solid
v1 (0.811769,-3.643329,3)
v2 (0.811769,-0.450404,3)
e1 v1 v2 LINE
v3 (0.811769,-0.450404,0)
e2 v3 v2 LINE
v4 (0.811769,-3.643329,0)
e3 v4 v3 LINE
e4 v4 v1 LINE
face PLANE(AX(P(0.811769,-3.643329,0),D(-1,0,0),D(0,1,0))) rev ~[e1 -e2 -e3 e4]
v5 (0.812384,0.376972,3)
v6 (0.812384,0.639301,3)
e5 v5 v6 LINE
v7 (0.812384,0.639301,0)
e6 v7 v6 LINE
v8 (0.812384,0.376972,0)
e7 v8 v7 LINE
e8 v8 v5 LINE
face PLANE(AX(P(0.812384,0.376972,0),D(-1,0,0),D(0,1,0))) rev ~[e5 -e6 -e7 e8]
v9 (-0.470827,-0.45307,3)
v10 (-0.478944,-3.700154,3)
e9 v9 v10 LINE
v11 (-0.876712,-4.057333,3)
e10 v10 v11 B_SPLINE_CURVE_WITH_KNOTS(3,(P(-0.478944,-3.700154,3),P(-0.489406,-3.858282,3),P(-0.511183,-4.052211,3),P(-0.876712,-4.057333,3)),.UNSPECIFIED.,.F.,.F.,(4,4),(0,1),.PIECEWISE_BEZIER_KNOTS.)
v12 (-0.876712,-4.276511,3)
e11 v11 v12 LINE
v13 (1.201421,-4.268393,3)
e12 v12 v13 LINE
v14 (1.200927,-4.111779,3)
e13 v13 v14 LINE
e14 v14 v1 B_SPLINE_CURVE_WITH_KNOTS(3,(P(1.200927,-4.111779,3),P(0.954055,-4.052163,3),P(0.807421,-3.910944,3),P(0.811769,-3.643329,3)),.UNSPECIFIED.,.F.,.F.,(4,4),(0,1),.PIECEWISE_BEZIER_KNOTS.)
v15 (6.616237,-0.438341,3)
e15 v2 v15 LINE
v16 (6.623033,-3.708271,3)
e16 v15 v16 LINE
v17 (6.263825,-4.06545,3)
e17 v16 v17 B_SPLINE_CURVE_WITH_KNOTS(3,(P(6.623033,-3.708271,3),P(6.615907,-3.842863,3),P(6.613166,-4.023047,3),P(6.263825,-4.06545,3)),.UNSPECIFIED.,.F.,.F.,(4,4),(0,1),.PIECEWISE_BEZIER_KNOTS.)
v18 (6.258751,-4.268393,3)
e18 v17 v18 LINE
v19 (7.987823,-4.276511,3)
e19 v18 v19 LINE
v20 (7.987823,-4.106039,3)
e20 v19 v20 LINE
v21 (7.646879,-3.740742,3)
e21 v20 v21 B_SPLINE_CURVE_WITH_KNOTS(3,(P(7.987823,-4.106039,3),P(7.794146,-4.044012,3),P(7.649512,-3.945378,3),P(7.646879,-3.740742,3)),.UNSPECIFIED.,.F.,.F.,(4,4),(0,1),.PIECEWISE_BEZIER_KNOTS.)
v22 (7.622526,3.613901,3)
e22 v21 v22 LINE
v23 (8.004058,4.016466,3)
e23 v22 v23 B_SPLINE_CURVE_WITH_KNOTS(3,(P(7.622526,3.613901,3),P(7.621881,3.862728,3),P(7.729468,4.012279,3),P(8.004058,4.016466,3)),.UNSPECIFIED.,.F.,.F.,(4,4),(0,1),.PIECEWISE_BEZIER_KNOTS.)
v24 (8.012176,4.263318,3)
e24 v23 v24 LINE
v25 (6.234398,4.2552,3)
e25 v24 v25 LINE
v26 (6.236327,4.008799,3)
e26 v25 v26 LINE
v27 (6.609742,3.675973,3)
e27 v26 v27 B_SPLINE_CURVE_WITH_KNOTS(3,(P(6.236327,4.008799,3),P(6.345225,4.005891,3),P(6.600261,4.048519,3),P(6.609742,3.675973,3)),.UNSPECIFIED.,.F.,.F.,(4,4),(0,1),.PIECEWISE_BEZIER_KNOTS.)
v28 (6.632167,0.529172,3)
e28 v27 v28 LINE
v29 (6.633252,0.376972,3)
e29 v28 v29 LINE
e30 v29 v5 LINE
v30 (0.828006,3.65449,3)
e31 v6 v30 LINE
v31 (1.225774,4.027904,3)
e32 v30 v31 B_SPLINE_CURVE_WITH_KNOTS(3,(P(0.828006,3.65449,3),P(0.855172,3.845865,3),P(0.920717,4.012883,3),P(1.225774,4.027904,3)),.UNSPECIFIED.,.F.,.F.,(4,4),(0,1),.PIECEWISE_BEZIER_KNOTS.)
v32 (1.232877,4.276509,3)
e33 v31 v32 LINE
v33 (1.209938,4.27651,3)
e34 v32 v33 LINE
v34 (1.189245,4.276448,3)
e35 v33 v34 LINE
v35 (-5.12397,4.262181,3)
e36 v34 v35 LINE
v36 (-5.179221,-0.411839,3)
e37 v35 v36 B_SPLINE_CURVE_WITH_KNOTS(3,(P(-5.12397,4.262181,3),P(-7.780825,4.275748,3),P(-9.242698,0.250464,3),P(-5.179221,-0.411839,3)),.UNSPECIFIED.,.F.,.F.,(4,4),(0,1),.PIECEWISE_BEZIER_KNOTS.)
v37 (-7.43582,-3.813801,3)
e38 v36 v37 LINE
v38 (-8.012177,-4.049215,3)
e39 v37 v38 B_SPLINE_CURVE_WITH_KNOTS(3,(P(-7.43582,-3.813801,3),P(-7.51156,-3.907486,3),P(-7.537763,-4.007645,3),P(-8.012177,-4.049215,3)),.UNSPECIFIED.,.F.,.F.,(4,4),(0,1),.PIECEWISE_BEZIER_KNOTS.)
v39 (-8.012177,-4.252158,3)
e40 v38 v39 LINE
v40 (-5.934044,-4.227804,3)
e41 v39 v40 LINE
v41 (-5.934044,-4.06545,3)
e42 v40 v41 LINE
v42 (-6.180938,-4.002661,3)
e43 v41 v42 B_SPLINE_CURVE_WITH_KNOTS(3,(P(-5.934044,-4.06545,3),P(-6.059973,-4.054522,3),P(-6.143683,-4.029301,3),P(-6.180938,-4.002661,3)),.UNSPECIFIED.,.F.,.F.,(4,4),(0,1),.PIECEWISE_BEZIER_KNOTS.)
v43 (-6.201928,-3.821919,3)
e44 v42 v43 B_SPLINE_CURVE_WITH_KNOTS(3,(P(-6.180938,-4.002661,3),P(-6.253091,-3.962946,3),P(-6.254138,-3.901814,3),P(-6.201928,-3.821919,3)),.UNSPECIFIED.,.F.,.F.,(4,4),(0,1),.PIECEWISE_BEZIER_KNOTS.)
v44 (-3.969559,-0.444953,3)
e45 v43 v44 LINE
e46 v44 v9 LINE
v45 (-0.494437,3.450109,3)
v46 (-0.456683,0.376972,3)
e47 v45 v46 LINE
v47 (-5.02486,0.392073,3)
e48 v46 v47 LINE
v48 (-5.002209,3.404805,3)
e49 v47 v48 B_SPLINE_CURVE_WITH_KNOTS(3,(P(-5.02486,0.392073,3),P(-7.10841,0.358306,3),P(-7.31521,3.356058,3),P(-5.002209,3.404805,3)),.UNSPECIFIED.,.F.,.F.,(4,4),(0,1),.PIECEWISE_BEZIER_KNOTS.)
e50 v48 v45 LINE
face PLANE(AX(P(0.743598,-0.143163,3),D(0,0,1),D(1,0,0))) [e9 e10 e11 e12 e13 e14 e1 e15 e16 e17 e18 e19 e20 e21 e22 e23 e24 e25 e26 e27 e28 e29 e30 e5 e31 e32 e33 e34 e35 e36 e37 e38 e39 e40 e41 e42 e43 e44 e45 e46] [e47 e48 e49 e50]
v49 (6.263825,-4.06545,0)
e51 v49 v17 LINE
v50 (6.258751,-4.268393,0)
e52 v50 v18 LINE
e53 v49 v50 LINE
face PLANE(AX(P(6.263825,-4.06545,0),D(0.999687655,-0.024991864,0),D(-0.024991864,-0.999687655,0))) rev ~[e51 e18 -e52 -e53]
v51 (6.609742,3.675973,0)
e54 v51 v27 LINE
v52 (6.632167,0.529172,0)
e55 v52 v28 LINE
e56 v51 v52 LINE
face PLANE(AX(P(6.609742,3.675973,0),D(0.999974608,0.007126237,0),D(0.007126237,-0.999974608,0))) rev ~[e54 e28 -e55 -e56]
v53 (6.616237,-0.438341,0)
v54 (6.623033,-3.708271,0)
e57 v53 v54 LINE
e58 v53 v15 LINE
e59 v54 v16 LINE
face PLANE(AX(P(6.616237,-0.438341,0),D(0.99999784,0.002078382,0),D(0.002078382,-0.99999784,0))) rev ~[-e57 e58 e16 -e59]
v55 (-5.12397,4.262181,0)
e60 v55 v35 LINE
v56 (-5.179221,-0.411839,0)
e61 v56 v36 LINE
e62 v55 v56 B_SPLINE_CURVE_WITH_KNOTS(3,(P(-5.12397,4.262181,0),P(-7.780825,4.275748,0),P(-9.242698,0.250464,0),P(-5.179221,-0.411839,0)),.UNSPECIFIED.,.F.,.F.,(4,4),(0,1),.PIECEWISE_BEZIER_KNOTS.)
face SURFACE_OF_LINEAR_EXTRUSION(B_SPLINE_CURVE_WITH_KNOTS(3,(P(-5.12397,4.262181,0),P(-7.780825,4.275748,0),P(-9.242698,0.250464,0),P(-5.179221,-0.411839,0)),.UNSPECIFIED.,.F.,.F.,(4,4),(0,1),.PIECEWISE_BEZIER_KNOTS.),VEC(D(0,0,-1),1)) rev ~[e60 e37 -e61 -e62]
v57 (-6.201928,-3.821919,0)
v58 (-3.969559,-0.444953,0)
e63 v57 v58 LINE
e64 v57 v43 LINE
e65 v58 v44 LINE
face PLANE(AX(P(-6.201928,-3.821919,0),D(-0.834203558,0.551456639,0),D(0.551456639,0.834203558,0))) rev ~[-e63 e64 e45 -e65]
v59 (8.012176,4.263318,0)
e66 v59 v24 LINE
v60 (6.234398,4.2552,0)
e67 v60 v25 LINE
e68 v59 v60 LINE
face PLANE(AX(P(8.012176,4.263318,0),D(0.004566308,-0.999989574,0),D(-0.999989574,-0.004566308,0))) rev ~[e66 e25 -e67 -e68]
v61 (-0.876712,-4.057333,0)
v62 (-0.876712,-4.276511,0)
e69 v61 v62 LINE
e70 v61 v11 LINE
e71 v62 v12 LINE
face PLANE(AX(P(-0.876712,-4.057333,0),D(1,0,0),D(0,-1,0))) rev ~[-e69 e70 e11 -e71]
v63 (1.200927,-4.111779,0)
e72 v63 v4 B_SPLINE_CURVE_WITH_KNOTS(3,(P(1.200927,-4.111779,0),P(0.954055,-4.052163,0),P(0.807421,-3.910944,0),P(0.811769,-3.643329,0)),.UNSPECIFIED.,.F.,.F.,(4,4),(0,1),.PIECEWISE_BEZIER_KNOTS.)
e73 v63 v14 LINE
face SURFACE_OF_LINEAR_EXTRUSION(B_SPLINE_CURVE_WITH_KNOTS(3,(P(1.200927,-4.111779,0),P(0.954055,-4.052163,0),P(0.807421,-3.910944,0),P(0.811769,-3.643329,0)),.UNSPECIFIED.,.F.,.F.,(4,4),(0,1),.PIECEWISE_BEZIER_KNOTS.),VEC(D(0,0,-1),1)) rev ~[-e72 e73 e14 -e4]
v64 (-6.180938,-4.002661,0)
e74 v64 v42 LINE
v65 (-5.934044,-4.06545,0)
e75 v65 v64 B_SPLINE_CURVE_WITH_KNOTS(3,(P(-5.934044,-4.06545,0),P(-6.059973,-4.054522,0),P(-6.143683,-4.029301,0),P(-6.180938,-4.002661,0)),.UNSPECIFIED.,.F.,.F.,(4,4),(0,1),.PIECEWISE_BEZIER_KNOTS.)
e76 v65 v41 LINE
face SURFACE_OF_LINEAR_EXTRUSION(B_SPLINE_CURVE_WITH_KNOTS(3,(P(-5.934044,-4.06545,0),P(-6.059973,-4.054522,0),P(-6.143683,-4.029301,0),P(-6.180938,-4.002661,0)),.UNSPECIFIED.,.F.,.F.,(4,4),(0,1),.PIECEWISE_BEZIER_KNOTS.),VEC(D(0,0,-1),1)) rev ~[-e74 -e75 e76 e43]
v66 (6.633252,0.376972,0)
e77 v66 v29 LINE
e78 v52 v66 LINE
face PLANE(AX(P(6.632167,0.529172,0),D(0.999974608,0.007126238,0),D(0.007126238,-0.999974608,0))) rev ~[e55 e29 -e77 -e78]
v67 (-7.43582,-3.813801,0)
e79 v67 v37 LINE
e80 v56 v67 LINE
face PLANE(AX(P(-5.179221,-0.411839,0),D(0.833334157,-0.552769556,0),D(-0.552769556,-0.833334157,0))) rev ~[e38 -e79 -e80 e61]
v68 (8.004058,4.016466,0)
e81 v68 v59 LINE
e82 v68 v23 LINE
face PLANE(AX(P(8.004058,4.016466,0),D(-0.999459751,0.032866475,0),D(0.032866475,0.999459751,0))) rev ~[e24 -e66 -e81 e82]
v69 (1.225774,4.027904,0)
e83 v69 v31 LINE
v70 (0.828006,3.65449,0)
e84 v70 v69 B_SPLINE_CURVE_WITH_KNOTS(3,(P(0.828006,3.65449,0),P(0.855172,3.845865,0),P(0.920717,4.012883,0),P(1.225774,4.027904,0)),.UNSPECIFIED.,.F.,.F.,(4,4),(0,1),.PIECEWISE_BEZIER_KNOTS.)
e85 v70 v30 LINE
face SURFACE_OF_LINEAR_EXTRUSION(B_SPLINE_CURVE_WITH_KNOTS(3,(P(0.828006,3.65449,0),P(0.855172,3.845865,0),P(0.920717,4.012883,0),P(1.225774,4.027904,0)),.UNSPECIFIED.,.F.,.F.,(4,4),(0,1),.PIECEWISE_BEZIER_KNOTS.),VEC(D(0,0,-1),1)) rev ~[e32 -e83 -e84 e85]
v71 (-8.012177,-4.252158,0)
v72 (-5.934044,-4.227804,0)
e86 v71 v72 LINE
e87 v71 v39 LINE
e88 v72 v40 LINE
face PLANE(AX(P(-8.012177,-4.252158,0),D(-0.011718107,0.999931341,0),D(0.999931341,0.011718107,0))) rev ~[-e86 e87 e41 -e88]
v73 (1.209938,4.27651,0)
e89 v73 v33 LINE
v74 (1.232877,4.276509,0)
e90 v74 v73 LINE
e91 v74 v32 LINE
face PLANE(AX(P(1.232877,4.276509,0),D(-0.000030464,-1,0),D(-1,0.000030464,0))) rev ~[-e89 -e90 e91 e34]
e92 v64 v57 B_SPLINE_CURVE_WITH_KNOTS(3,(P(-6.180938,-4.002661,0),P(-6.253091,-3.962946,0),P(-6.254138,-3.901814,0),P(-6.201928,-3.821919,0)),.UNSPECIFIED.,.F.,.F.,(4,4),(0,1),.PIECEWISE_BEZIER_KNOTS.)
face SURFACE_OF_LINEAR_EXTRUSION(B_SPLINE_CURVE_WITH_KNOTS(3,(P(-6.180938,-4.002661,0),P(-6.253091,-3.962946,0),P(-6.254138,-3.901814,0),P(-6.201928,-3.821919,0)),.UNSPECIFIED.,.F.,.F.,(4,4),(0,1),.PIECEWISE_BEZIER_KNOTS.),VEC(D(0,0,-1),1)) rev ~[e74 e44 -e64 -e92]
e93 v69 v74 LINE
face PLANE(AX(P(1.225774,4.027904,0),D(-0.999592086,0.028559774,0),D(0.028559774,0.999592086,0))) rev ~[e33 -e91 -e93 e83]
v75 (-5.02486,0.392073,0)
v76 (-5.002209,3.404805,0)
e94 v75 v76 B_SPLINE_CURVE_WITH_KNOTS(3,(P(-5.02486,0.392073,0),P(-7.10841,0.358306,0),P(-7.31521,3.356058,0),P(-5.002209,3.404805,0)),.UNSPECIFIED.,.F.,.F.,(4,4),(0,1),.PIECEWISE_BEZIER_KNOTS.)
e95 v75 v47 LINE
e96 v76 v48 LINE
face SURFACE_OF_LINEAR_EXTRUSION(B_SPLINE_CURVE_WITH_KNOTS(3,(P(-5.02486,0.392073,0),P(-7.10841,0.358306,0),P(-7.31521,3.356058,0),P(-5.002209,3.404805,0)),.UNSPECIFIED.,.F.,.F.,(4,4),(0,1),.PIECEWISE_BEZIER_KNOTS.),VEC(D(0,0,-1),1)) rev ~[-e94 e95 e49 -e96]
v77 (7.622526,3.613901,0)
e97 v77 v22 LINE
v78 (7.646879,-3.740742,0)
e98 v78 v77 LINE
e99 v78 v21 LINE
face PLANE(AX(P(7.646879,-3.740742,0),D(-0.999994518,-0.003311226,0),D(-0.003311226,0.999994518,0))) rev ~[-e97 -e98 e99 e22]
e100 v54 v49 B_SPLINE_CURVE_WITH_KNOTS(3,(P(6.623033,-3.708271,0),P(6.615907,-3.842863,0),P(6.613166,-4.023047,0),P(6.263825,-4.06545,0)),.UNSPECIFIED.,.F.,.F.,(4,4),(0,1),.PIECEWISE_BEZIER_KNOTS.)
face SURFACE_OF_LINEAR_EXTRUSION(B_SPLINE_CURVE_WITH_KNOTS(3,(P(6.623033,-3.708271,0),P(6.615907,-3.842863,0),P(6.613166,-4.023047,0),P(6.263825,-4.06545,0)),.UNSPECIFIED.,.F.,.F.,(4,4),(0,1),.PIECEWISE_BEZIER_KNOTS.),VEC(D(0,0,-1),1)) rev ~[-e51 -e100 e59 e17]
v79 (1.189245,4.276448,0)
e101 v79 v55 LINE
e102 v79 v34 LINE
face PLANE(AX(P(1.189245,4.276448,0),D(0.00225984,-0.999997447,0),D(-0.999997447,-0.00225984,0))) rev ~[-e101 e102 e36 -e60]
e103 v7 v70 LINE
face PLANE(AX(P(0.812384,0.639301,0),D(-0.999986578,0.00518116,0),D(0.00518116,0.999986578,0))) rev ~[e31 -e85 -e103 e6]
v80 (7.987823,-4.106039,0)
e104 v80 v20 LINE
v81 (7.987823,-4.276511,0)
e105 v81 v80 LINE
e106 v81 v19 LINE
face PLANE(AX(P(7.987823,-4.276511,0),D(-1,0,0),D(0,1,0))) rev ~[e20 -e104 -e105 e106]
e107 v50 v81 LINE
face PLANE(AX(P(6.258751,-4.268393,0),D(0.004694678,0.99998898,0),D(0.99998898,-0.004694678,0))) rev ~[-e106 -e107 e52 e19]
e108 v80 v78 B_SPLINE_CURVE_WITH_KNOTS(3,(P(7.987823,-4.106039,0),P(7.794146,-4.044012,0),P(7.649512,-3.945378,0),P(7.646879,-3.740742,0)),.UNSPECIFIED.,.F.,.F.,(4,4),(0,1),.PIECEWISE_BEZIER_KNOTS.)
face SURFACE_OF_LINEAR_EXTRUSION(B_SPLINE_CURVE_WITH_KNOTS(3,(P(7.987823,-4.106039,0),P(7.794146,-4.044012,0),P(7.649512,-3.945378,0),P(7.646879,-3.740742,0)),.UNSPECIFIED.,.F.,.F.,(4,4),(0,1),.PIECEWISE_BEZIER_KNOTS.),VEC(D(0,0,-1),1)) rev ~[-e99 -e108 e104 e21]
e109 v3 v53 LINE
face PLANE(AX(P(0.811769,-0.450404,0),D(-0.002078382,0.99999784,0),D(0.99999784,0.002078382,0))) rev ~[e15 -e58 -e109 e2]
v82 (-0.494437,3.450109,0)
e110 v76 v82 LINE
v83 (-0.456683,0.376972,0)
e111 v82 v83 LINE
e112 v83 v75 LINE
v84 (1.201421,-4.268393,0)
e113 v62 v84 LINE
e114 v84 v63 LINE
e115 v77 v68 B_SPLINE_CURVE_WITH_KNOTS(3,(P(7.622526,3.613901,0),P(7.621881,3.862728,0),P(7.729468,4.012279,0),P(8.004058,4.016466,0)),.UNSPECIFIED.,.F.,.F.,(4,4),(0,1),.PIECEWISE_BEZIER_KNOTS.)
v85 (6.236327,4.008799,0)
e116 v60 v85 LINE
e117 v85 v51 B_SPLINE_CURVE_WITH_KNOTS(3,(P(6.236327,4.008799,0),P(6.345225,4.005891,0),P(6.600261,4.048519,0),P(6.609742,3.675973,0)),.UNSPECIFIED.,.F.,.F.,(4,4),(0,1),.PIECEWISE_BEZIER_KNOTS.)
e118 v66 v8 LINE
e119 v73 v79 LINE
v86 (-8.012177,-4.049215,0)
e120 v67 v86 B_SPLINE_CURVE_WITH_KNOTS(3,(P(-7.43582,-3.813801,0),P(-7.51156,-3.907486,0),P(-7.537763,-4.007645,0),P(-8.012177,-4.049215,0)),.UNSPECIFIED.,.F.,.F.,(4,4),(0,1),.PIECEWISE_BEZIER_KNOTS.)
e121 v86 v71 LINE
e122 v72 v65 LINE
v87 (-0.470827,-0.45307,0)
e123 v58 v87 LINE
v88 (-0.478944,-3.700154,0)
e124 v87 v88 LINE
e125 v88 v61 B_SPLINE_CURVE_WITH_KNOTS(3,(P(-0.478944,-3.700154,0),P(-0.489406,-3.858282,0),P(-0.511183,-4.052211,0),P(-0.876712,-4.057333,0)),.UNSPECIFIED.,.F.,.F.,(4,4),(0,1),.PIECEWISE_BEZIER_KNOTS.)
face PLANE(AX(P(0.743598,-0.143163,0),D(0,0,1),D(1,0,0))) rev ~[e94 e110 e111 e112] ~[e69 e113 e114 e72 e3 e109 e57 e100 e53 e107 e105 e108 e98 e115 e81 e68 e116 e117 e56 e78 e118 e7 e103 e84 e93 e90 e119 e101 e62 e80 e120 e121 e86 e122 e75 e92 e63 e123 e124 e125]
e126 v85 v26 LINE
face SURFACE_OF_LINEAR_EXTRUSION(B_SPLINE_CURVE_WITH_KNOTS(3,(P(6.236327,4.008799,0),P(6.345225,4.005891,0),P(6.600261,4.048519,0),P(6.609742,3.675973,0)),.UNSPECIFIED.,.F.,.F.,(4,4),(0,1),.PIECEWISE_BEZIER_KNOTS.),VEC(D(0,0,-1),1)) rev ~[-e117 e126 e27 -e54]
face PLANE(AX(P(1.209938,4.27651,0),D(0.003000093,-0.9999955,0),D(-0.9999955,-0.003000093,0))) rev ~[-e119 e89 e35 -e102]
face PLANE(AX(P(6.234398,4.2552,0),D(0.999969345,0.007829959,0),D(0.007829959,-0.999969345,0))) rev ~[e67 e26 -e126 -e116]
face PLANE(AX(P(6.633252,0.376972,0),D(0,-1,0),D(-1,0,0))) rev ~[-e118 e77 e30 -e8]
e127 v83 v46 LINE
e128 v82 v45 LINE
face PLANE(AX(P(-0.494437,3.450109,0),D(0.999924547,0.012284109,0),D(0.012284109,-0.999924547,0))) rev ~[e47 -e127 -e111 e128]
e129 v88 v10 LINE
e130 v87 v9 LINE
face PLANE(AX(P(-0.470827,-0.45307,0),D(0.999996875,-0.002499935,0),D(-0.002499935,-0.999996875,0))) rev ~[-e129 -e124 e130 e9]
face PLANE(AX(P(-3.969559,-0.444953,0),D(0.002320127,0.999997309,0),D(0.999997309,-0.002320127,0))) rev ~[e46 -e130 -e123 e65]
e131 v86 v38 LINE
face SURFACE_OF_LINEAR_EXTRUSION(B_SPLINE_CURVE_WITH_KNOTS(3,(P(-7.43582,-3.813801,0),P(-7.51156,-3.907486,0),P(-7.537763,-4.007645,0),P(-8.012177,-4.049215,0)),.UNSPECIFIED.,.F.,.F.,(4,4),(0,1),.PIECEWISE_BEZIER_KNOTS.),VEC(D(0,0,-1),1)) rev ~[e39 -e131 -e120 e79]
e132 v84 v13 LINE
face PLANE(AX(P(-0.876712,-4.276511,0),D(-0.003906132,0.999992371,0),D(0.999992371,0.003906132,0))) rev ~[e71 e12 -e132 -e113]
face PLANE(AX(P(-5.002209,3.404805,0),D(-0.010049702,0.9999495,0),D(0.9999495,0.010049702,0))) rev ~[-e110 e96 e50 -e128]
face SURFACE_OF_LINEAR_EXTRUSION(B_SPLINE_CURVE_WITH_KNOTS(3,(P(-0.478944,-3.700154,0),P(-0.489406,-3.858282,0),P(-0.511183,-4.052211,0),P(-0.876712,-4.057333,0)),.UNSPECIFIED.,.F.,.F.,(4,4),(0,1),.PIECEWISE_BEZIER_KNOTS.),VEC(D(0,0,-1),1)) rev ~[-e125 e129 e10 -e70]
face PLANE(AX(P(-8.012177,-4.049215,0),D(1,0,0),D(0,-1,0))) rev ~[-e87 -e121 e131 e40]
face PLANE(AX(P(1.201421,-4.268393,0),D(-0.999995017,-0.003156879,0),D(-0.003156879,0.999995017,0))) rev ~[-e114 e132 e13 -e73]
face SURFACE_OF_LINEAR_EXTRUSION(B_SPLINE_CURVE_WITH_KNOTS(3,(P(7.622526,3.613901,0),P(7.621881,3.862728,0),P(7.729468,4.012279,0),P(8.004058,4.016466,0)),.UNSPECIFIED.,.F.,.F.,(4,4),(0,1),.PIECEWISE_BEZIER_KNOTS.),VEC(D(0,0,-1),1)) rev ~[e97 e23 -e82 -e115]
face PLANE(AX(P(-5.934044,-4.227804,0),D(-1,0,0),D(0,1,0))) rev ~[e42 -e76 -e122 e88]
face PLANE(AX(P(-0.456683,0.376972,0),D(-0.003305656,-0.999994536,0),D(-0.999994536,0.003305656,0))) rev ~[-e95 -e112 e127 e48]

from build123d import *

# Parameters (mm, degrees)
F1_DEPTH = 3


# Not quite as in the source:
# - ends of sketch curves that miss each other by under 0.0002 mm in the source are joined


with BuildPart() as f1:
    # F0 (on Top) → F1 (new body)
    with BuildSketch(Plane.XY):
        with BuildLine():
            Line((1.1892447866, 4.276448), (-5.1239697534, 4.2621811105))
            add(Edge.make_bspline(
                [(-5.1239697534, 4.2621811105), (-7.7808246997, 4.2757478261), (-9.2426975653, 0.2504639081), (-5.1792210147, -0.4118392886)],
                knots=[0, 0, 0, 0, 1, 1, 1, 1], degree=3))
            Line((-5.1792210147, -0.4118392886), (-7.4358199708, -3.8138012247))
            add(Edge.make_bspline(
                [(-7.4358199708, -3.8138012247), (-7.5115597505, -3.9074856806), (-7.537762832, -4.0076449282), (-8.0121770072, -4.0492147307)],
                knots=[0, 0, 0, 0, 1, 1, 1, 1], degree=3))
            Line((-8.0121770072, -4.0492147307), (-8.0121770072, -4.2521576986))
            Line((-8.0121770072, -4.2521576986), (-5.9340439579, -4.2278042412))
            Line((-5.9340439579, -4.2278042412), (-5.9340439579, -4.0654502213))
            add(Edge.make_bspline(
                [(-5.9340439579, -4.0654502213), (-6.0599730098, -4.054522155), (-6.1436827864, -4.0293012572), (-6.1809375378, -4.0026613543)],
                knots=[0, 0, 0, 0, 1, 1, 1, 1], degree=3))
            add(Edge.make_bspline(
                [(-6.1809375378, -4.0026613543), (-6.2530914835, -3.9629456061), (-6.2541383485, -3.9018136478), (-6.2019284451, -3.8219191915)],
                knots=[0, 0, 0, 0, 1, 1, 1, 1], degree=3))
            Line((-6.2019284451, -3.8219191915), (-3.9695588998, -0.4449526542))
            Line((-3.9695588998, -0.4449526542), (-0.4708268475, -0.453070178))
            Line((-0.4708268475, -0.453070178), (-0.4789443713, -3.7001536766))
            add(Edge.make_bspline(
                [(-0.4789443713, -3.7001536766), (-0.4894063767, -3.8582816931), (-0.511182765, -4.0522109002), (-0.8767118972, -4.0573326976)],
                knots=[0, 0, 0, 0, 1, 1, 1, 1], degree=3))
            Line((-0.8767118972, -4.0573326976), (-0.8767118972, -4.276510713))
            Line((-0.8767118972, -4.276510713), (1.2014211521, -4.2683931892))
            Line((1.2014211521, -4.2683931892), (1.2009267376, -4.1117789848))
            add(Edge.make_bspline(
                [(1.2009267376, -4.1117789848), (0.9540548658, -4.0521630537), (0.8074211, -3.9109443668), (0.8117693779, -3.643329238)],
                knots=[0, 0, 0, 0, 1, 1, 1, 1], degree=3))
            Line((0.8117693779, -3.643329238), (0.8117693779, -0.4504044473))
            Line((0.8117693779, -0.4504044473), (6.6162368382, -0.4383405203))
            Line((6.6162368382, -0.4383405203), (6.623033018, -3.7082712004))
            add(Edge.make_bspline(
                [(6.623033018, -3.7082712004), (6.6159065383, -3.8428631383), (6.6131664366, -4.0230470912), (6.2638249484, -4.0654502213)],
                knots=[0, 0, 0, 0, 1, 1, 1, 1], degree=3))
            Line((6.2638249484, -4.0654502213), (6.2587514407, -4.2683931892))
            Line((6.2587514407, -4.2683931892), (7.9878229928, -4.276510713))
            Line((7.9878229928, -4.276510713), (7.9878229928, -4.1060387263))
            add(Edge.make_bspline(
                [(7.9878229928, -4.1060387263), (7.7941463093, -4.0440123031), (7.6495123525, -3.9453779431), (7.6468790194, -3.7407417386)],
                knots=[0, 0, 0, 0, 1, 1, 1, 1], degree=3))
            Line((7.6468790194, -3.7407417386), (7.6225260051, 3.6139009438))
            add(Edge.make_bspline(
                [(7.6225260051, 3.6139009438), (7.6218814055, 3.8627278793), (7.729467946, 4.0122785134), (8.0040584834, 4.0164664167)],
                knots=[0, 0, 0, 0, 1, 1, 1, 1], degree=3))
            Line((8.0040584834, 4.0164664167), (8.0121760072, 4.2633179094))
            Line((8.0121760072, 4.2633179094), (6.2343979833, 4.2551999426))
            Line((6.2343979833, 4.2551999426), (6.2363273516, 4.008799005))
            add(Edge.make_bspline(
                [(6.2363273516, 4.008799005), (6.3452247993, 4.0058905543), (6.6002611554, 4.0485187405), (6.6097418632, 3.6759729985)],
                knots=[0, 0, 0, 0, 1, 1, 1, 1], degree=3))
            Line((6.6097418632, 3.6759729985), (6.6321672813, 0.5291723511))
            Line((6.6321672813, 0.5291723511), (6.6332519216, 0.3769724351))
            Line((6.6332519216, 0.3769724351), (0.8123838086, 0.3769724351))
            Line((0.8123838086, 0.3769724351), (0.8123838086, 0.6393006265))
            Line((0.8123838086, 0.6393006265), (0.8280061975, 3.6544898918))
            add(Edge.make_bspline(
                [(0.8280061975, 3.6544898918), (0.8551715265, 3.8458646241), (0.9207173302, 4.0128832408), (1.2257741664, 4.0279044033)],
                knots=[0, 0, 0, 0, 1, 1, 1, 1], degree=3))
            Line((1.2257741664, 4.0279044033), (1.2328771659, 4.2765093839))
            Line((1.2328771659, 4.2765093839), (1.2099382837, 4.2765100827))
            Line((1.2099382837, 4.2765100827), (1.1892447866, 4.276448))
        make_face()
        with BuildLine():
            Line((-0.456683315, 0.3769724351), (-5.024860472, 0.3920733419))
            add(Edge.make_bspline(
                [(-5.024860472, 0.3920733419), (-7.1084099294, 0.3583060733), (-7.3152098618, 3.3560575894), (-5.0022086687, 3.4048052624)],
                knots=[0, 0, 0, 0, 1, 1, 1, 1], degree=3))
            Line((-5.0022086687, 3.4048052624), (-0.4944369111, 3.450109312))
            Line((-0.4944369111, 3.450109312), (-0.456683315, 0.3769724351))
        make_face(mode=Mode.SUBTRACT)
    extrude(amount=F1_DEPTH)


solid = f1.part
